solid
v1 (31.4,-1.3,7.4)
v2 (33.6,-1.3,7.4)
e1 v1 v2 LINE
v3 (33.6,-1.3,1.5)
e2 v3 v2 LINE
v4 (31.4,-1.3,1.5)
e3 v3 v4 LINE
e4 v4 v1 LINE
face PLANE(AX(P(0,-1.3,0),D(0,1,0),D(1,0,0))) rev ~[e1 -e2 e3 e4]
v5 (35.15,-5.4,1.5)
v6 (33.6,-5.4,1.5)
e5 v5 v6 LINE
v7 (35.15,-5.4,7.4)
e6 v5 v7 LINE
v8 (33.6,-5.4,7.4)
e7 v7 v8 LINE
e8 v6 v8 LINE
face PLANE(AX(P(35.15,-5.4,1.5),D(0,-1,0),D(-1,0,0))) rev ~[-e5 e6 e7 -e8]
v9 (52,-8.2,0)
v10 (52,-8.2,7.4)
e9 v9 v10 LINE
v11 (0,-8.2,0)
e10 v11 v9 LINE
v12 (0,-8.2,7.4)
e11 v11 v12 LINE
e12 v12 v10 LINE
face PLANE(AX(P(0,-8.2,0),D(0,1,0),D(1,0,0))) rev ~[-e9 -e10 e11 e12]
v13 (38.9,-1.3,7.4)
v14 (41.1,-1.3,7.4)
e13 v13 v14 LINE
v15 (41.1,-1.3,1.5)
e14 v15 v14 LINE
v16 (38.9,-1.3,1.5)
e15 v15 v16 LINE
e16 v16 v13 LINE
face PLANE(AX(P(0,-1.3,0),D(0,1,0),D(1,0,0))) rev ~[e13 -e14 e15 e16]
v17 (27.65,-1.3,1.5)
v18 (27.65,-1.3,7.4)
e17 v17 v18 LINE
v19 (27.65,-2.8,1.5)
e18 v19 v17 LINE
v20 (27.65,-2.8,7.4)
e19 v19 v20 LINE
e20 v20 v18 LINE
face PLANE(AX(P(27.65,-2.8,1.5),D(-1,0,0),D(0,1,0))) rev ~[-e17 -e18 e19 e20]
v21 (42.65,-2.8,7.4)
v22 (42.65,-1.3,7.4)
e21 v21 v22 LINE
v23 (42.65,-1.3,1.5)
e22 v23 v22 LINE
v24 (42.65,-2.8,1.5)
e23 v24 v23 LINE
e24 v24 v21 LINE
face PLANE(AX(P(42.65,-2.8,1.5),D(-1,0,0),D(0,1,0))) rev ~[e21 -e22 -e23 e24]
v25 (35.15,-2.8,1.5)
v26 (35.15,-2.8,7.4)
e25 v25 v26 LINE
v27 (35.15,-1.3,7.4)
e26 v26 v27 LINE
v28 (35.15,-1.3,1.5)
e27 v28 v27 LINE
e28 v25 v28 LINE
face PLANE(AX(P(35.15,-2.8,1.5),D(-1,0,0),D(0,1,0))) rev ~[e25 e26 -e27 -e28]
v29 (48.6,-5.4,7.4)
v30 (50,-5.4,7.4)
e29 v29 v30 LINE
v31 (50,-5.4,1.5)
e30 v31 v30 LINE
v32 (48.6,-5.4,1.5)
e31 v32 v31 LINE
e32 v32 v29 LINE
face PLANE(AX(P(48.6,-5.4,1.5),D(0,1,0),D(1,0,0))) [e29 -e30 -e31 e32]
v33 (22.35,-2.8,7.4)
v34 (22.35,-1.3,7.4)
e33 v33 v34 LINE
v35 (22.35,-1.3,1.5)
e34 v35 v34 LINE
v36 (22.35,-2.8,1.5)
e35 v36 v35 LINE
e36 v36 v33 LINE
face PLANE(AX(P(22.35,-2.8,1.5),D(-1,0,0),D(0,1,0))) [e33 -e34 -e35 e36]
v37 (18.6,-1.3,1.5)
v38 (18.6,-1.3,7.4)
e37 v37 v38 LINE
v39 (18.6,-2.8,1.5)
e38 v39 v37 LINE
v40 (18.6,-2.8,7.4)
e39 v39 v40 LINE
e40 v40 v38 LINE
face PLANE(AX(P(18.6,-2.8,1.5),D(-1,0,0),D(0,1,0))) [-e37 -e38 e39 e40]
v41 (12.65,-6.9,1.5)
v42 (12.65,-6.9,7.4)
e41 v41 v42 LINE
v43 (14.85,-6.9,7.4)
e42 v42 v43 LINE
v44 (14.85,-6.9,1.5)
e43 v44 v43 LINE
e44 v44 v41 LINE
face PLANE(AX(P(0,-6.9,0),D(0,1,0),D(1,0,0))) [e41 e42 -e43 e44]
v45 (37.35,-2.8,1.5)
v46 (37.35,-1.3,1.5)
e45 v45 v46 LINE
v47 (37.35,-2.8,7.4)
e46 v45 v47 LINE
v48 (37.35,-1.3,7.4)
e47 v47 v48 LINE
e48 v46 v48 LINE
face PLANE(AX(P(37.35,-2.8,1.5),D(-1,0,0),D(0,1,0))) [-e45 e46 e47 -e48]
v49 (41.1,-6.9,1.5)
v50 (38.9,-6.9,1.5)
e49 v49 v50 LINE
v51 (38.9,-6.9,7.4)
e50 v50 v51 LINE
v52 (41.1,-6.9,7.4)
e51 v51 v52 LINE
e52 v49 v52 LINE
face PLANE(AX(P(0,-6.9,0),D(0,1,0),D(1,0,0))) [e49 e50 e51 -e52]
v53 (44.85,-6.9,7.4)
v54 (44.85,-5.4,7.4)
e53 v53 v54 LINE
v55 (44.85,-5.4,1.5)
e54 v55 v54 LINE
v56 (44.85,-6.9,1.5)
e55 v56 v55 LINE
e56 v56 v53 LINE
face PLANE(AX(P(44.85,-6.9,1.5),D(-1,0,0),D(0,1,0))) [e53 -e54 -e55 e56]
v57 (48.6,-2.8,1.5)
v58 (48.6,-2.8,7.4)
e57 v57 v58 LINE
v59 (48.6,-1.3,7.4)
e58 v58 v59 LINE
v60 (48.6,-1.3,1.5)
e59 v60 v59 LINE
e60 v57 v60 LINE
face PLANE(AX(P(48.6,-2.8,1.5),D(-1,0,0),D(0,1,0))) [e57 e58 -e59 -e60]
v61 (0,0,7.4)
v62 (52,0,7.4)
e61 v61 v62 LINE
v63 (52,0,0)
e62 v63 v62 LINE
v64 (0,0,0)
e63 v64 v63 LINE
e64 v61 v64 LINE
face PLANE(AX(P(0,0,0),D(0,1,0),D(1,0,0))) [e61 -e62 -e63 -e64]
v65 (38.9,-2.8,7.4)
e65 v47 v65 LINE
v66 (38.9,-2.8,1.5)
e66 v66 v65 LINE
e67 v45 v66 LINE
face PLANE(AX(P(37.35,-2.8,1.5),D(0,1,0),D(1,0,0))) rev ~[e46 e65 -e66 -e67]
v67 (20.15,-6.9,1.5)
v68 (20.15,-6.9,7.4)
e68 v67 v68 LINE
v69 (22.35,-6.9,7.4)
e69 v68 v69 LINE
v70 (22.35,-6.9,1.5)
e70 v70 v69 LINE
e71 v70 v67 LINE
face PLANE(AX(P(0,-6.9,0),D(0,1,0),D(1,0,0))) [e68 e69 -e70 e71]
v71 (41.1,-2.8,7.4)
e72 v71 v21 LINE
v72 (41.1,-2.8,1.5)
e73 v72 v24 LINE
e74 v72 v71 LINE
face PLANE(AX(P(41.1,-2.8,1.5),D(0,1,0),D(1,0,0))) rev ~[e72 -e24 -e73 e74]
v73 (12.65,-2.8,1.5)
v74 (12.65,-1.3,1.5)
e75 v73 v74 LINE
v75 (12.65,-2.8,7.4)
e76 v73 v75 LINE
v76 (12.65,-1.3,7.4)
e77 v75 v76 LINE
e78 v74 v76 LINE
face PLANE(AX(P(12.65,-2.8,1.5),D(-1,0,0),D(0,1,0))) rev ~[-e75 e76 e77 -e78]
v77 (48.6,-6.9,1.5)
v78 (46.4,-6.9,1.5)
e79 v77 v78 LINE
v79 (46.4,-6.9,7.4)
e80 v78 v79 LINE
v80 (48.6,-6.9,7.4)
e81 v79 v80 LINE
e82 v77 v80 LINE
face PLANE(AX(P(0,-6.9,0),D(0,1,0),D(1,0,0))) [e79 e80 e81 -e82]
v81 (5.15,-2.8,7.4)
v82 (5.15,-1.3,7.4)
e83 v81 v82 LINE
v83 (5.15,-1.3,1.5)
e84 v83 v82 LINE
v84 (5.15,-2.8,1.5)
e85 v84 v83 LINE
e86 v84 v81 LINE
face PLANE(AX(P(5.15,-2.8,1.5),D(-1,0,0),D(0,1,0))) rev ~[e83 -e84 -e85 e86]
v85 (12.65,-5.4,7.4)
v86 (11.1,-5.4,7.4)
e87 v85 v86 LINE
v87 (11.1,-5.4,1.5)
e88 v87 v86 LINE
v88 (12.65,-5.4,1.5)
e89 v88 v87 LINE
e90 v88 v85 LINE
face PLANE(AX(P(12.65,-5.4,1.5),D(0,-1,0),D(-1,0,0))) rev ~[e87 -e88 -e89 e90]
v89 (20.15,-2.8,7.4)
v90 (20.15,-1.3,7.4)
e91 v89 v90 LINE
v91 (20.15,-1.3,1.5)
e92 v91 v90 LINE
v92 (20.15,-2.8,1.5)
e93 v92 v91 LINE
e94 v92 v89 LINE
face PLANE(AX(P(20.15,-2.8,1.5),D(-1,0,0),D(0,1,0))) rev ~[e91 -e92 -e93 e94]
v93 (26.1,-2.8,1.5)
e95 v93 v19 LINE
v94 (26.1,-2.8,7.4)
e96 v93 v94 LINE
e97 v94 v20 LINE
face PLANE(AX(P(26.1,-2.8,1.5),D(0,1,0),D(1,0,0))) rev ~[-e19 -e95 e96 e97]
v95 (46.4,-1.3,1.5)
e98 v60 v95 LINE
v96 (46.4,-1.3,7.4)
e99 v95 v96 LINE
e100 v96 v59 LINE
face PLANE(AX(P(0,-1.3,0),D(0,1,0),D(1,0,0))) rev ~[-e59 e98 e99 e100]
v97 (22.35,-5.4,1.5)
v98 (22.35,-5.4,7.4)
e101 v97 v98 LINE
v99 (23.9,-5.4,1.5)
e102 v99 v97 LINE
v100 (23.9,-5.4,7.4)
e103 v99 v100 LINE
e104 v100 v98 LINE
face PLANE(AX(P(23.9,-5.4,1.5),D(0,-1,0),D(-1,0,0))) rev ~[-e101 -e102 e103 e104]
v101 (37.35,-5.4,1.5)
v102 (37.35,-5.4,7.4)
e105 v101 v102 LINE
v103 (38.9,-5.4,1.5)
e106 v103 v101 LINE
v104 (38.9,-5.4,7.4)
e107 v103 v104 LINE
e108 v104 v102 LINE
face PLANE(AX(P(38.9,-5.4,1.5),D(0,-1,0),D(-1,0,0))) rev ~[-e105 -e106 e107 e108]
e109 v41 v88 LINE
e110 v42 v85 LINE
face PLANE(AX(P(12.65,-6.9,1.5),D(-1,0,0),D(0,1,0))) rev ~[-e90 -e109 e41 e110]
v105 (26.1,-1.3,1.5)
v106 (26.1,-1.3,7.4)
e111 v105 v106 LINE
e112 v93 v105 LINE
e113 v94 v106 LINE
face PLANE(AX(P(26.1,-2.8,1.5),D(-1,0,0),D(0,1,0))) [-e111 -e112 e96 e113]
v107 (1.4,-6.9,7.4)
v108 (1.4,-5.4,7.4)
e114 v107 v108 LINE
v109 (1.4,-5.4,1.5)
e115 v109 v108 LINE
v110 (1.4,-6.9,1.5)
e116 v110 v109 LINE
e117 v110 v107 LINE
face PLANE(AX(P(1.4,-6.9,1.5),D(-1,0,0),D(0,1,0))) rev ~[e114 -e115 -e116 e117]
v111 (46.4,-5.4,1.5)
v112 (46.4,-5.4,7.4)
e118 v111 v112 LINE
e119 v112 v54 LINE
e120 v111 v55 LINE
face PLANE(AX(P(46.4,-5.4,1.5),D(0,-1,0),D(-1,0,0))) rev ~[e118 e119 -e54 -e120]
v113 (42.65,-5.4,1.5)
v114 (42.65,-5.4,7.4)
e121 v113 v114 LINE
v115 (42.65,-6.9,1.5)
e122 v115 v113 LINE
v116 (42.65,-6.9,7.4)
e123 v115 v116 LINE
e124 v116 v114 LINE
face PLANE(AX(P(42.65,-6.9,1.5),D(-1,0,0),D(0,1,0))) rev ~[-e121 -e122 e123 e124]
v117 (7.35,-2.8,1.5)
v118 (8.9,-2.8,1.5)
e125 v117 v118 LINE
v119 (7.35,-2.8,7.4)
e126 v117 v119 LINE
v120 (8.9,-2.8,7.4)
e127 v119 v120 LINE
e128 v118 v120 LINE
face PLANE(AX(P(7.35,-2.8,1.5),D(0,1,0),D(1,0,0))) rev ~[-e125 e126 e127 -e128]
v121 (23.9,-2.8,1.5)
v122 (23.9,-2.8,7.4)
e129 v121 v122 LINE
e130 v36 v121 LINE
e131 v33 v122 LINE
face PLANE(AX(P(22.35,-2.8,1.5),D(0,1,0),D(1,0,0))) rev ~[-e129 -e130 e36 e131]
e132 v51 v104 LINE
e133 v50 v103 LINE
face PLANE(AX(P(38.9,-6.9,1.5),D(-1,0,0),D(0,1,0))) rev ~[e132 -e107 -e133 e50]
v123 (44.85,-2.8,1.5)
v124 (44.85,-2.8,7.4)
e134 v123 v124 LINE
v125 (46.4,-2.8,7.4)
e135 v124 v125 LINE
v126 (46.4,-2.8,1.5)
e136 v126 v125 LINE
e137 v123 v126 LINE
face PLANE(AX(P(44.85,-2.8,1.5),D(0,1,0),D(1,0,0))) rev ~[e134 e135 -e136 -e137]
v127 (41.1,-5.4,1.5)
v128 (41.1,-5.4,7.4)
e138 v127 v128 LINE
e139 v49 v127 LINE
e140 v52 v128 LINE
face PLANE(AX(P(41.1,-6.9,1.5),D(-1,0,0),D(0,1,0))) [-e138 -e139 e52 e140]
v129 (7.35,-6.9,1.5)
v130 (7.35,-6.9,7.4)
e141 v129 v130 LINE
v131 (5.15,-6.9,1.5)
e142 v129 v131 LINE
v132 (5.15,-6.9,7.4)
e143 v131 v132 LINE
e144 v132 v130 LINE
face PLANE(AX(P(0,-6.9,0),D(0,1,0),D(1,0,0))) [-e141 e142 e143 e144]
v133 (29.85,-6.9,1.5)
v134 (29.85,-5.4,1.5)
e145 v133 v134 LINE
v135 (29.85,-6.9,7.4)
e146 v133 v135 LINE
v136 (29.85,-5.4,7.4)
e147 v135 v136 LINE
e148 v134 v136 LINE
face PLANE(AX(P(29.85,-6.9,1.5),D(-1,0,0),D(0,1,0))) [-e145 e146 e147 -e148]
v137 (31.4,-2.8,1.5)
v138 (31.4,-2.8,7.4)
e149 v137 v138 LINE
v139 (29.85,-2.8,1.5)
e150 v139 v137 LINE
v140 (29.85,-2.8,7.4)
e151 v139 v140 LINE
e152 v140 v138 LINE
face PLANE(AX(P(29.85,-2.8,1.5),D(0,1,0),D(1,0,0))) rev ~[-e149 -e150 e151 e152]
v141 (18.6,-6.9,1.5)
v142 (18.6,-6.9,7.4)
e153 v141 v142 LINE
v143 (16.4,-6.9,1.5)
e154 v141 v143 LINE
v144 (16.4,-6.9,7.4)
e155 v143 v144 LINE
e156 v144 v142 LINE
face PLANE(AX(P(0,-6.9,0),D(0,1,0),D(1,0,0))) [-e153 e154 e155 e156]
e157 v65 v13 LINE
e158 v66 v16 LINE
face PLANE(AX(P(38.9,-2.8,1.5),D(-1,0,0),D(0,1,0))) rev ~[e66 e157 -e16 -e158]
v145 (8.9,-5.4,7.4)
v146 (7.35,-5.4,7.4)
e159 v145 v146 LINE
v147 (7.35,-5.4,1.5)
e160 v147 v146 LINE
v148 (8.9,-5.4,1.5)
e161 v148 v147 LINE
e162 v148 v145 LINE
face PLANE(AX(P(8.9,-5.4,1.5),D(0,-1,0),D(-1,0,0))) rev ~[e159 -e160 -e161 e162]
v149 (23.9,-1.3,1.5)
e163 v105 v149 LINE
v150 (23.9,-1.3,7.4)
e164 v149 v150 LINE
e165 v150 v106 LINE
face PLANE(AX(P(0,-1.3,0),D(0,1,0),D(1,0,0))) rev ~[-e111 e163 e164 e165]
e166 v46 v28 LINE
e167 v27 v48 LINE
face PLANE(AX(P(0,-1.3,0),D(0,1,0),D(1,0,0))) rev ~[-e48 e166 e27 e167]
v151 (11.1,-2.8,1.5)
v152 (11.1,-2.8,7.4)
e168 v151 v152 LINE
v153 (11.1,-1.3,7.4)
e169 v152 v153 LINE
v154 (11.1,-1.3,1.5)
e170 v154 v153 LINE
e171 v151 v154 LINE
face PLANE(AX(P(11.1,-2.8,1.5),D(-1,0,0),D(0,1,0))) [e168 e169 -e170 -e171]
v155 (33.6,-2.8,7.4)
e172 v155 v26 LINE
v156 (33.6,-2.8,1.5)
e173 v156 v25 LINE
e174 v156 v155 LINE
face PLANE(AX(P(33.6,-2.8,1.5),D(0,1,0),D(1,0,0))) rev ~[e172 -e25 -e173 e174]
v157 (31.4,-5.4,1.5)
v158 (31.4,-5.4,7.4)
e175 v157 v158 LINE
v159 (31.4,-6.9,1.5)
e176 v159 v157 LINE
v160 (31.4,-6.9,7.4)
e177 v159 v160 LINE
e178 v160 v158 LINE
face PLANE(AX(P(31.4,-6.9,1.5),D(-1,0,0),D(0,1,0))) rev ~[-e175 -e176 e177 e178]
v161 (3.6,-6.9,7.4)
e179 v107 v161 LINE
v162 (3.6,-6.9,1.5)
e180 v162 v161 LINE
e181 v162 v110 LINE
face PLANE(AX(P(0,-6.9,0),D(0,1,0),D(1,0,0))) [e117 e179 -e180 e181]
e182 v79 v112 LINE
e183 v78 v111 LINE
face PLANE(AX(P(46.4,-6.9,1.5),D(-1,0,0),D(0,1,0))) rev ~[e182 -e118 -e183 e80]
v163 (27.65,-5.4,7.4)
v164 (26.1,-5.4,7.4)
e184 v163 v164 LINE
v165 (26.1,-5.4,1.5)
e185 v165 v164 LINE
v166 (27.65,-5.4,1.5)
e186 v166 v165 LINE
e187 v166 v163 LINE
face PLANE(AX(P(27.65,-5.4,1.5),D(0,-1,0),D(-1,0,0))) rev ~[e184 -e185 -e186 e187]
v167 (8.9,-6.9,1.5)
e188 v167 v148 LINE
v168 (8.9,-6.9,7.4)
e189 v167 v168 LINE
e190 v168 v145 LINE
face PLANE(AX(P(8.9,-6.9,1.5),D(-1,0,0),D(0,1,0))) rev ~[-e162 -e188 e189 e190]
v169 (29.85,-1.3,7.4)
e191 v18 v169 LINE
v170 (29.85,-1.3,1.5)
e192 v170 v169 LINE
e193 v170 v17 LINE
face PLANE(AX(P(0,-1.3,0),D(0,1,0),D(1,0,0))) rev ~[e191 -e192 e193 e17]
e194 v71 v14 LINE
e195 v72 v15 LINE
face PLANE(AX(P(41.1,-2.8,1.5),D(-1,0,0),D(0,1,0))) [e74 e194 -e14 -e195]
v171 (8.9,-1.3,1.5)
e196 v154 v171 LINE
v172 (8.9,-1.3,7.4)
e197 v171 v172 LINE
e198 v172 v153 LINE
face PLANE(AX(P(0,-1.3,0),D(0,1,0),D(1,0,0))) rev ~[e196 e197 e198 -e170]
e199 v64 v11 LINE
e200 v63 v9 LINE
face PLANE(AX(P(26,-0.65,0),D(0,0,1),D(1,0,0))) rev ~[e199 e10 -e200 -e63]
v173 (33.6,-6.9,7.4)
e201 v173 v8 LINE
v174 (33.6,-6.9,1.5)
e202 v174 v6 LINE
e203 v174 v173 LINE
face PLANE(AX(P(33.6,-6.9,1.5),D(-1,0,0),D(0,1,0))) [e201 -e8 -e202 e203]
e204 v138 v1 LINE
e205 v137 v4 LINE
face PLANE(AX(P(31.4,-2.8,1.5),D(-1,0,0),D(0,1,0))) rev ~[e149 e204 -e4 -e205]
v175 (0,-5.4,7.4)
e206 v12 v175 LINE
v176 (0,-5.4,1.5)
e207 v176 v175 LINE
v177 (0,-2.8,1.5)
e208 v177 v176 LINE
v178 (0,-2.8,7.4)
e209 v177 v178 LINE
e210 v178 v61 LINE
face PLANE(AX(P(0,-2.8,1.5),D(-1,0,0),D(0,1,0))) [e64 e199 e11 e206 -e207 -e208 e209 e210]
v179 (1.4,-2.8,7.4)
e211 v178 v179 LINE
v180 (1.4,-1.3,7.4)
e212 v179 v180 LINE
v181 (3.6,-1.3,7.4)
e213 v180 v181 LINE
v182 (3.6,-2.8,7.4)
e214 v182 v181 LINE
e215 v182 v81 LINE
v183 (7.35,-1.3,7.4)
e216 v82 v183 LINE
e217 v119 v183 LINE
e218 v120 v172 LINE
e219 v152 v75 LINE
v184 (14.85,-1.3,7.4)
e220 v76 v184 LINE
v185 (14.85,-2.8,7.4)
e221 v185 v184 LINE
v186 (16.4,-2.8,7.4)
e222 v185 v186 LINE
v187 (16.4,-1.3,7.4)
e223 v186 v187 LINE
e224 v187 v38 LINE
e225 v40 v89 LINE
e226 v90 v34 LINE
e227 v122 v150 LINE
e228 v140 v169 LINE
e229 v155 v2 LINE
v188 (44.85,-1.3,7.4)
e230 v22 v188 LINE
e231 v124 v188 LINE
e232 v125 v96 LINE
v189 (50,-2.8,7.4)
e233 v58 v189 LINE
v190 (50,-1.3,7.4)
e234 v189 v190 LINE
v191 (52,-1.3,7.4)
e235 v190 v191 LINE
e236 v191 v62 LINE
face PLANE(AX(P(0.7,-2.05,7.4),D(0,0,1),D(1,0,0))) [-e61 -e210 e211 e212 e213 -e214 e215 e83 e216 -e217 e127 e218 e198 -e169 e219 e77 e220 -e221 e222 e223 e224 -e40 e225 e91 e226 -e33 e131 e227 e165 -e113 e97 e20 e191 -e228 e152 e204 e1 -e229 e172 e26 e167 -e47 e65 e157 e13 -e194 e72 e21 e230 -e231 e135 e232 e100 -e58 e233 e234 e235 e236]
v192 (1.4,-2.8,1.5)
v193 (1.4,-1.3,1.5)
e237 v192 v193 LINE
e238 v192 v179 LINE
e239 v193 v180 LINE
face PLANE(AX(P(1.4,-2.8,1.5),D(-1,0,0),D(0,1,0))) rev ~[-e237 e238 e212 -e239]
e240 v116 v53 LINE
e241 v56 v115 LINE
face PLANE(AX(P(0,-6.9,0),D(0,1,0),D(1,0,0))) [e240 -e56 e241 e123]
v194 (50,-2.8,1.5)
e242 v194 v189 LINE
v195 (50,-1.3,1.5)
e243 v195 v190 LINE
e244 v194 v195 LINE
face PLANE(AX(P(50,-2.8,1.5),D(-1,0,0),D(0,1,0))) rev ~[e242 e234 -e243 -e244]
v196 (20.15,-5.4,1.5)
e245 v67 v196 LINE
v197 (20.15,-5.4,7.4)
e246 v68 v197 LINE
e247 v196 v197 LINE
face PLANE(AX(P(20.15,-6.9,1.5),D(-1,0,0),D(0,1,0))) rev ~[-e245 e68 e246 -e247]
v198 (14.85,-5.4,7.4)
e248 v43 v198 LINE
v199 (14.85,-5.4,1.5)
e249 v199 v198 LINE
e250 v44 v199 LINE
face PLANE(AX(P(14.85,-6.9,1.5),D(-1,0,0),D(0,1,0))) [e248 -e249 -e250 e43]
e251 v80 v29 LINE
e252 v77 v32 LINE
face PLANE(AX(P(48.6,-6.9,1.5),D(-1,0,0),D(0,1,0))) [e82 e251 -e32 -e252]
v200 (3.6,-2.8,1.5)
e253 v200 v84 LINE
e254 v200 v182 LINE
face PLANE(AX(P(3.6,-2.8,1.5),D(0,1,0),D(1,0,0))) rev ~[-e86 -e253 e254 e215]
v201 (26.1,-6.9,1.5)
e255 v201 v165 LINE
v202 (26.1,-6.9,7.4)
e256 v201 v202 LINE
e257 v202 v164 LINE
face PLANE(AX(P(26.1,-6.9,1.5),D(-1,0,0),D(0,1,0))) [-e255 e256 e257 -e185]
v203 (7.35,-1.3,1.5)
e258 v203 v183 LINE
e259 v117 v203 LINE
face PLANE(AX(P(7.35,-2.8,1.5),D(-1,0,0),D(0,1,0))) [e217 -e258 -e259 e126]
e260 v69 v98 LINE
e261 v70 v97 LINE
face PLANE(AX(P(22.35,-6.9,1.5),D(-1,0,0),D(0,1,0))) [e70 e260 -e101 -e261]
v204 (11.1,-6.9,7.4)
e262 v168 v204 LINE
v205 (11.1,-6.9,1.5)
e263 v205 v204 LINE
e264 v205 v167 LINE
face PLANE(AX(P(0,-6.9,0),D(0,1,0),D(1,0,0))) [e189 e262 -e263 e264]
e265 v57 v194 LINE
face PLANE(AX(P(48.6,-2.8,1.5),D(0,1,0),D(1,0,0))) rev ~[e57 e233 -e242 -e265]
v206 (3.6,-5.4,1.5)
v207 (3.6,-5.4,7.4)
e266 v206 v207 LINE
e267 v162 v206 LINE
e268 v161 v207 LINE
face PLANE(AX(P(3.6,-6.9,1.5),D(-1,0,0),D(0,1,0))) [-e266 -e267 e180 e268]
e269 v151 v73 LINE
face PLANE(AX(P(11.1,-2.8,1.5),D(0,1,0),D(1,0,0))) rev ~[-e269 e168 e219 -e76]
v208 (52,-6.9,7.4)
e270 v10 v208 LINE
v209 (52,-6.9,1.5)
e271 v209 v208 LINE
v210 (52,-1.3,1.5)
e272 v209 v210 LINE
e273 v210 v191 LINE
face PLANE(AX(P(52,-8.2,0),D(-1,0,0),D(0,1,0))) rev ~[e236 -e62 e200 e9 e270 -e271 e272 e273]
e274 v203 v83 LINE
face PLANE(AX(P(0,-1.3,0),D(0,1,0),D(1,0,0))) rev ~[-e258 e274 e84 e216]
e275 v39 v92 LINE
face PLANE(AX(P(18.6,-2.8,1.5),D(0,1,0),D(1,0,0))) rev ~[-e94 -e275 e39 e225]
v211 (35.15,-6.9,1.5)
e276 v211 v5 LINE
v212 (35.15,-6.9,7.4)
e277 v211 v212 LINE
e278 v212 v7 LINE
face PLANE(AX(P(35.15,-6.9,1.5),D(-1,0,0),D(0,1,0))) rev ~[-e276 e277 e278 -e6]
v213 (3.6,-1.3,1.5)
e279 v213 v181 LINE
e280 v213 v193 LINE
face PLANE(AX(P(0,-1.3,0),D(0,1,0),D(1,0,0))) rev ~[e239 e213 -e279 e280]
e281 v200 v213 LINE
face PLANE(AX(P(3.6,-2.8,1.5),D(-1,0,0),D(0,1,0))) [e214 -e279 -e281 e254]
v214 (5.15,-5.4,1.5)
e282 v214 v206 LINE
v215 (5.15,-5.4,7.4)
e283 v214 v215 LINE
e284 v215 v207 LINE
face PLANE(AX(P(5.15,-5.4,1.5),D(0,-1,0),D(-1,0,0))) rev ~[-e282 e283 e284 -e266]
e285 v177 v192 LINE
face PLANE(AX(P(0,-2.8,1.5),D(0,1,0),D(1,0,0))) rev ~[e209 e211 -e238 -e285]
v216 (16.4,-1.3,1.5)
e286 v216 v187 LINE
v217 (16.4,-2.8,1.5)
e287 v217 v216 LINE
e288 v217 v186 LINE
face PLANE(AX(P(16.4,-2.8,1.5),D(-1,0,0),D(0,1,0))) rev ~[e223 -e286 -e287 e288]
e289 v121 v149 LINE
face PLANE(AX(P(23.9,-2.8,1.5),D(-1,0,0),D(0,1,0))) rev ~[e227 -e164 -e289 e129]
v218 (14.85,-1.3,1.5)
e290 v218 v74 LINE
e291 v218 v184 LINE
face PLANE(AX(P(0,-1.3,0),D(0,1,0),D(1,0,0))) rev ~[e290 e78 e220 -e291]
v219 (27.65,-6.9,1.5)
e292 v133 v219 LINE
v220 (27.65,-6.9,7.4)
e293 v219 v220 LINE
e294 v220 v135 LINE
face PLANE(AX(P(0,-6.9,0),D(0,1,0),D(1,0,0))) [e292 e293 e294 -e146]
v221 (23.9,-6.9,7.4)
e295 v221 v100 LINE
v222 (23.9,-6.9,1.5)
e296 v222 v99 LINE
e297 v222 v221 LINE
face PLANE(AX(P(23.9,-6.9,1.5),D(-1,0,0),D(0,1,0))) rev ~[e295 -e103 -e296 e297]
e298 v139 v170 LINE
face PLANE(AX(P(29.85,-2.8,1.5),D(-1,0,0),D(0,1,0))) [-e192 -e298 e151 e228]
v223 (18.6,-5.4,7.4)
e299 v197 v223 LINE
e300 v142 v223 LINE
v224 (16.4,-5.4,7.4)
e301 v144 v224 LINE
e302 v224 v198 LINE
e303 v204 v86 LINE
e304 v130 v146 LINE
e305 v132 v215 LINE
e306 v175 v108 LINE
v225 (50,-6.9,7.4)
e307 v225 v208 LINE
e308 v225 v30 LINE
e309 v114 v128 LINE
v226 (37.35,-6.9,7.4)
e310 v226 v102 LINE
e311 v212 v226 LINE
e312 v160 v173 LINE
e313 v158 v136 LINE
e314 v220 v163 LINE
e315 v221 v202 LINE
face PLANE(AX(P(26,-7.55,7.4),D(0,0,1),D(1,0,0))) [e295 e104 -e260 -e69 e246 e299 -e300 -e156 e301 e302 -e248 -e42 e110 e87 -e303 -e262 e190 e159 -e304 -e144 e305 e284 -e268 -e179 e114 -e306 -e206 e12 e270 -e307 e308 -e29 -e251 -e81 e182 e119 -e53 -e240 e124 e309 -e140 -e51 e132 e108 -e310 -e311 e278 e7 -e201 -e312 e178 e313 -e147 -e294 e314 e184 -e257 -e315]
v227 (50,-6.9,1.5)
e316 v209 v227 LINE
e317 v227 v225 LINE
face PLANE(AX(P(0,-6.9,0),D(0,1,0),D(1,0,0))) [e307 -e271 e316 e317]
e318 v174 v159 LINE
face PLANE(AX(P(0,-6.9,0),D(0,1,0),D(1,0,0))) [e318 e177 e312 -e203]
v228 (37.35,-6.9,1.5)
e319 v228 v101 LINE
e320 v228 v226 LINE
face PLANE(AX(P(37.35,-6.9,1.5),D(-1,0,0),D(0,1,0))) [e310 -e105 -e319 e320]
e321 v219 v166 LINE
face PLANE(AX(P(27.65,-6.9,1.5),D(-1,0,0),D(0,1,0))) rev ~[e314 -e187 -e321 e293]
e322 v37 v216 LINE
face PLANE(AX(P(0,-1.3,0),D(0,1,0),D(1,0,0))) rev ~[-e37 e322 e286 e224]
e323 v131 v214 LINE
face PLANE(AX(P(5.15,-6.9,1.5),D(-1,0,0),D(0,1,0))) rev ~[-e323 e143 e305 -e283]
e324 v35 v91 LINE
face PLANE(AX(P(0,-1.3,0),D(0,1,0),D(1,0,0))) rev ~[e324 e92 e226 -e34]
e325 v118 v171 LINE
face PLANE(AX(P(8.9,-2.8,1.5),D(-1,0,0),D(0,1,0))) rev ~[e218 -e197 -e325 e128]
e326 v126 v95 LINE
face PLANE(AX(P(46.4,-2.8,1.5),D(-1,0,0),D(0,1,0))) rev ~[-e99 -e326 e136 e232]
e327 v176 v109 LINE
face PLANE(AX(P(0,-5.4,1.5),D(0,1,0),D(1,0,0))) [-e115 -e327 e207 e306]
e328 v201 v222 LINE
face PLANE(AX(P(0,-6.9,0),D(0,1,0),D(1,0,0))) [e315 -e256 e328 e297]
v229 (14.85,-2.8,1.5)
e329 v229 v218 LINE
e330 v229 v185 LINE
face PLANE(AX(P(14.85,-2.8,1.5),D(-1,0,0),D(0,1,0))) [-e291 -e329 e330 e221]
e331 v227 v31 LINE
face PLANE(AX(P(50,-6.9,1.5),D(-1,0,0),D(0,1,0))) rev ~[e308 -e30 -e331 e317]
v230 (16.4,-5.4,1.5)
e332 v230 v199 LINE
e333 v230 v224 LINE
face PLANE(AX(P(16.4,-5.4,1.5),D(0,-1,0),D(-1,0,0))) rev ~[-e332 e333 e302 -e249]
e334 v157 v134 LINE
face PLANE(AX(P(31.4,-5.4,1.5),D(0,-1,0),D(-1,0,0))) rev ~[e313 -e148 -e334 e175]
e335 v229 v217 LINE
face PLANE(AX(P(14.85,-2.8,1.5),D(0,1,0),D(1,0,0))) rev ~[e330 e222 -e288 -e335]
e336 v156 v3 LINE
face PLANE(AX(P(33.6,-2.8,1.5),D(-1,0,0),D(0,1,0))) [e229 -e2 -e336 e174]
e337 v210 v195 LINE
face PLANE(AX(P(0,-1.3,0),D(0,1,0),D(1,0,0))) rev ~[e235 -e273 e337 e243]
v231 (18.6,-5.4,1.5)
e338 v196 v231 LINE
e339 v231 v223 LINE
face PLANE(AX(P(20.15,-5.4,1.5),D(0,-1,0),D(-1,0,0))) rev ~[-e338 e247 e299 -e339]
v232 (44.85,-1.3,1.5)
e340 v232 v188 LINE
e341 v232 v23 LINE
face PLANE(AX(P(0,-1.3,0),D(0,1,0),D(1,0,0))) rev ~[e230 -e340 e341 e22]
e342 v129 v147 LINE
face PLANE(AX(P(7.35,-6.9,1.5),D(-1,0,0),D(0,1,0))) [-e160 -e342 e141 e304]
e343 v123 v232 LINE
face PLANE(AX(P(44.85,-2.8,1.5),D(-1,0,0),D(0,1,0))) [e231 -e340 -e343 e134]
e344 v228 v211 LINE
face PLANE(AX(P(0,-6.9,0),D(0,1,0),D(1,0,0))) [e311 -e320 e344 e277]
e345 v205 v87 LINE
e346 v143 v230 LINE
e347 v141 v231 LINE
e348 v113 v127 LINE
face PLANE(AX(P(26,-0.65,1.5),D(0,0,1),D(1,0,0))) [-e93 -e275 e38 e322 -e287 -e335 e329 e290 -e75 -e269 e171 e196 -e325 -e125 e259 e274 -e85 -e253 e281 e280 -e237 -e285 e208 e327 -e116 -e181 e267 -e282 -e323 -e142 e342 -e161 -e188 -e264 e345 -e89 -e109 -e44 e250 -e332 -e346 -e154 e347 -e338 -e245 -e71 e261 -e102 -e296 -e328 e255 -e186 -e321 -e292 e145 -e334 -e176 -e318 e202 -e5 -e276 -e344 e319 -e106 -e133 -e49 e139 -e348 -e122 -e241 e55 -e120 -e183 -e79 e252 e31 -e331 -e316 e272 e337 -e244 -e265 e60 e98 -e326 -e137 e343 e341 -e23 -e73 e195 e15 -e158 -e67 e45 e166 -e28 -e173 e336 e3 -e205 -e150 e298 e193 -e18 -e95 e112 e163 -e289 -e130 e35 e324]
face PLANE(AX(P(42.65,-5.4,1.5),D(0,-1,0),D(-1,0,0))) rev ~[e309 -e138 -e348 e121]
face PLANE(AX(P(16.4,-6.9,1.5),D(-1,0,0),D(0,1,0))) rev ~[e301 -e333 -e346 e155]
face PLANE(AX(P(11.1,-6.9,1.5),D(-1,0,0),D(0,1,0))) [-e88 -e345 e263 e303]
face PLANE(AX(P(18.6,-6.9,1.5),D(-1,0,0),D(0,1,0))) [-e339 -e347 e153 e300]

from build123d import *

# Parameters (mm, degrees)
F1_W     = 52
F1_H     = 1.3
F1_H_2   = 5.6
F2_DEPTH = 1.5
F3_DEPTH = 7.4
F4_W     = 1.4
F4_H     = 1.5
F4_W_2   = 0.15
F4_W_3   = 1.25
F5_DEPTH = 5.9


with BuildPart() as f2:
    # F1 (on Top) → F2 (new body)
    with BuildSketch(Plane.XY):
        with Locations((26, -0.65)):
            Rectangle(F1_W, F1_H)
        with Locations((26, -4.1)):
            Rectangle(F1_W, F1_H_2)
        with Locations((26, -7.55)):
            Rectangle(F1_W, F1_H)
    extrude(amount=F2_DEPTH)

    # F1 (on Top) → F3 (join)
    with BuildSketch(Plane.XY):
        with Locations((26, -7.55)):
            Rectangle(F1_W, F1_H)
        with Locations((26, -0.65)):
            Rectangle(F1_W, F1_H)
    extrude(amount=F3_DEPTH)

    # F4 (on face) → F5 (join)
    with BuildSketch(Plane.XY.offset(1.5)):
        with Locations((0.7, -2.05)):
            Rectangle(F4_W, F4_H)
        with Locations((0.7, -6.15)):
            Rectangle(F4_W, F4_H)
        with Locations((3.675, -2.05)):
            Rectangle(F4_W_2, F4_H)
        with Locations((4.375, -2.05)):
            Rectangle(F4_W_3, F4_H)
        with Locations((5.075, -2.05)):
            Rectangle(F4_W_2, F4_H)
        with Locations((3.675, -6.15)):
            Rectangle(F4_W_2, F4_H)
        with Locations((4.375, -6.15)):
            Rectangle(F4_W_3, F4_H)
        with Locations((5.075, -6.15)):
            Rectangle(F4_W_2, F4_H)
        with Locations((7.425, -2.05)):
            Rectangle(F4_W_2, F4_H)
        with Locations((8.125, -2.05)):
            Rectangle(F4_W_3, F4_H)
        with Locations((8.825, -2.05)):
            Rectangle(F4_W_2, F4_H)
        with Locations((7.425, -6.15)):
            Rectangle(F4_W_2, F4_H)
        with Locations((8.125, -6.15)):
            Rectangle(F4_W_3, F4_H)
        with Locations((8.825, -6.15)):
            Rectangle(F4_W_2, F4_H)
        with Locations((11.175, -2.05)):
            Rectangle(F4_W_2, F4_H)
        with Locations((11.875, -2.05)):
            Rectangle(F4_W_3, F4_H)
        with Locations((12.575, -2.05)):
            Rectangle(F4_W_2, F4_H)
        with Locations((11.175, -6.15)):
            Rectangle(F4_W_2, F4_H)
        with Locations((11.875, -6.15)):
            Rectangle(F4_W_3, F4_H)
        with Locations((12.575, -6.15)):
            Rectangle(F4_W_2, F4_H)
        with Locations((14.925, -2.05)):
            Rectangle(F4_W_2, F4_H)
        with Locations((15.625, -2.05)):
            Rectangle(F4_W_3, F4_H)
        with Locations((16.325, -2.05)):
            Rectangle(F4_W_2, F4_H)
        with Locations((14.925, -6.15)):
            Rectangle(F4_W_2, F4_H)
        with Locations((15.625, -6.15)):
            Rectangle(F4_W_3, F4_H)
        with Locations((16.325, -6.15)):
            Rectangle(F4_W_2, F4_H)
        with Locations((18.675, -2.05)):
            Rectangle(F4_W_2, F4_H)
        with Locations((19.375, -2.05)):
            Rectangle(F4_W_3, F4_H)
        with Locations((20.075, -2.05)):
            Rectangle(F4_W_2, F4_H)
        with Locations((18.675, -6.15)):
            Rectangle(F4_W_2, F4_H)
        with Locations((19.375, -6.15)):
            Rectangle(F4_W_3, F4_H)
        with Locations((20.075, -6.15)):
            Rectangle(F4_W_2, F4_H)
        with Locations((22.425, -2.05)):
            Rectangle(F4_W_2, F4_H)
        with Locations((23.125, -2.05)):
            Rectangle(F4_W_3, F4_H)
        with Locations((23.825, -2.05)):
            Rectangle(F4_W_2, F4_H)
        with Locations((22.425, -6.15)):
            Rectangle(F4_W_2, F4_H)
        with Locations((23.125, -6.15)):
            Rectangle(F4_W_3, F4_H)
        with Locations((23.825, -6.15)):
            Rectangle(F4_W_2, F4_H)
        with Locations((26.175, -2.05)):
            Rectangle(F4_W_2, F4_H)
        with Locations((26.875, -2.05)):
            Rectangle(F4_W_3, F4_H)
        with Locations((27.575, -2.05)):
            Rectangle(F4_W_2, F4_H)
        with Locations((26.175, -6.15)):
            Rectangle(F4_W_2, F4_H)
        with Locations((26.875, -6.15)):
            Rectangle(F4_W_3, F4_H)
        with Locations((27.575, -6.15)):
            Rectangle(F4_W_2, F4_H)
        with Locations((29.925, -2.05)):
            Rectangle(F4_W_2, F4_H)
        with Locations((30.625, -2.05)):
            Rectangle(F4_W_3, F4_H)
        with Locations((31.325, -2.05)):
            Rectangle(F4_W_2, F4_H)
        with Locations((29.925, -6.15)):
            Rectangle(F4_W_2, F4_H)
        with Locations((30.625, -6.15)):
            Rectangle(F4_W_3, F4_H)
        with Locations((31.325, -6.15)):
            Rectangle(F4_W_2, F4_H)
        with Locations((33.675, -2.05)):
            Rectangle(F4_W_2, F4_H)
        with Locations((34.375, -2.05)):
            Rectangle(F4_W_3, F4_H)
        with Locations((35.075, -2.05)):
            Rectangle(F4_W_2, F4_H)
        with Locations((33.675, -6.15)):
            Rectangle(F4_W_2, F4_H)
        with Locations((34.375, -6.15)):
            Rectangle(F4_W_3, F4_H)
        with Locations((35.075, -6.15)):
            Rectangle(F4_W_2, F4_H)
        with Locations((37.425, -2.05)):
            Rectangle(F4_W_2, F4_H)
        with Locations((38.125, -2.05)):
            Rectangle(F4_W_3, F4_H)
        with Locations((38.825, -2.05)):
            Rectangle(F4_W_2, F4_H)
        with Locations((37.425, -6.15)):
            Rectangle(F4_W_2, F4_H)
        with Locations((38.125, -6.15)):
            Rectangle(F4_W_3, F4_H)
        with Locations((38.825, -6.15)):
            Rectangle(F4_W_2, F4_H)
        with Locations((41.175, -2.05)):
            Rectangle(F4_W_2, F4_H)
        with Locations((41.875, -2.05)):
            Rectangle(F4_W_3, F4_H)
        with Locations((42.575, -2.05)):
            Rectangle(F4_W_2, F4_H)
        with Locations((41.175, -6.15)):
            Rectangle(F4_W_2, F4_H)
        with Locations((41.875, -6.15)):
            Rectangle(F4_W_3, F4_H)
        with Locations((42.575, -6.15)):
            Rectangle(F4_W_2, F4_H)
        with Locations((44.925, -2.05)):
            Rectangle(F4_W_2, F4_H)
        with Locations((45.625, -2.05)):
            Rectangle(F4_W_3, F4_H)
        with Locations((46.325, -2.05)):
            Rectangle(F4_W_2, F4_H)
        with Locations((44.925, -6.15)):
            Rectangle(F4_W_2, F4_H)
        with Locations((45.625, -6.15)):
            Rectangle(F4_W_3, F4_H)
        with Locations((46.325, -6.15)):
            Rectangle(F4_W_2, F4_H)
        with Locations((49.3, -2.05)):
            Rectangle(F4_W, F4_H)
        with Locations((49.3, -6.15)):
            Rectangle(F4_W, F4_H)
    extrude(amount=F5_DEPTH)


solid = f2.part
